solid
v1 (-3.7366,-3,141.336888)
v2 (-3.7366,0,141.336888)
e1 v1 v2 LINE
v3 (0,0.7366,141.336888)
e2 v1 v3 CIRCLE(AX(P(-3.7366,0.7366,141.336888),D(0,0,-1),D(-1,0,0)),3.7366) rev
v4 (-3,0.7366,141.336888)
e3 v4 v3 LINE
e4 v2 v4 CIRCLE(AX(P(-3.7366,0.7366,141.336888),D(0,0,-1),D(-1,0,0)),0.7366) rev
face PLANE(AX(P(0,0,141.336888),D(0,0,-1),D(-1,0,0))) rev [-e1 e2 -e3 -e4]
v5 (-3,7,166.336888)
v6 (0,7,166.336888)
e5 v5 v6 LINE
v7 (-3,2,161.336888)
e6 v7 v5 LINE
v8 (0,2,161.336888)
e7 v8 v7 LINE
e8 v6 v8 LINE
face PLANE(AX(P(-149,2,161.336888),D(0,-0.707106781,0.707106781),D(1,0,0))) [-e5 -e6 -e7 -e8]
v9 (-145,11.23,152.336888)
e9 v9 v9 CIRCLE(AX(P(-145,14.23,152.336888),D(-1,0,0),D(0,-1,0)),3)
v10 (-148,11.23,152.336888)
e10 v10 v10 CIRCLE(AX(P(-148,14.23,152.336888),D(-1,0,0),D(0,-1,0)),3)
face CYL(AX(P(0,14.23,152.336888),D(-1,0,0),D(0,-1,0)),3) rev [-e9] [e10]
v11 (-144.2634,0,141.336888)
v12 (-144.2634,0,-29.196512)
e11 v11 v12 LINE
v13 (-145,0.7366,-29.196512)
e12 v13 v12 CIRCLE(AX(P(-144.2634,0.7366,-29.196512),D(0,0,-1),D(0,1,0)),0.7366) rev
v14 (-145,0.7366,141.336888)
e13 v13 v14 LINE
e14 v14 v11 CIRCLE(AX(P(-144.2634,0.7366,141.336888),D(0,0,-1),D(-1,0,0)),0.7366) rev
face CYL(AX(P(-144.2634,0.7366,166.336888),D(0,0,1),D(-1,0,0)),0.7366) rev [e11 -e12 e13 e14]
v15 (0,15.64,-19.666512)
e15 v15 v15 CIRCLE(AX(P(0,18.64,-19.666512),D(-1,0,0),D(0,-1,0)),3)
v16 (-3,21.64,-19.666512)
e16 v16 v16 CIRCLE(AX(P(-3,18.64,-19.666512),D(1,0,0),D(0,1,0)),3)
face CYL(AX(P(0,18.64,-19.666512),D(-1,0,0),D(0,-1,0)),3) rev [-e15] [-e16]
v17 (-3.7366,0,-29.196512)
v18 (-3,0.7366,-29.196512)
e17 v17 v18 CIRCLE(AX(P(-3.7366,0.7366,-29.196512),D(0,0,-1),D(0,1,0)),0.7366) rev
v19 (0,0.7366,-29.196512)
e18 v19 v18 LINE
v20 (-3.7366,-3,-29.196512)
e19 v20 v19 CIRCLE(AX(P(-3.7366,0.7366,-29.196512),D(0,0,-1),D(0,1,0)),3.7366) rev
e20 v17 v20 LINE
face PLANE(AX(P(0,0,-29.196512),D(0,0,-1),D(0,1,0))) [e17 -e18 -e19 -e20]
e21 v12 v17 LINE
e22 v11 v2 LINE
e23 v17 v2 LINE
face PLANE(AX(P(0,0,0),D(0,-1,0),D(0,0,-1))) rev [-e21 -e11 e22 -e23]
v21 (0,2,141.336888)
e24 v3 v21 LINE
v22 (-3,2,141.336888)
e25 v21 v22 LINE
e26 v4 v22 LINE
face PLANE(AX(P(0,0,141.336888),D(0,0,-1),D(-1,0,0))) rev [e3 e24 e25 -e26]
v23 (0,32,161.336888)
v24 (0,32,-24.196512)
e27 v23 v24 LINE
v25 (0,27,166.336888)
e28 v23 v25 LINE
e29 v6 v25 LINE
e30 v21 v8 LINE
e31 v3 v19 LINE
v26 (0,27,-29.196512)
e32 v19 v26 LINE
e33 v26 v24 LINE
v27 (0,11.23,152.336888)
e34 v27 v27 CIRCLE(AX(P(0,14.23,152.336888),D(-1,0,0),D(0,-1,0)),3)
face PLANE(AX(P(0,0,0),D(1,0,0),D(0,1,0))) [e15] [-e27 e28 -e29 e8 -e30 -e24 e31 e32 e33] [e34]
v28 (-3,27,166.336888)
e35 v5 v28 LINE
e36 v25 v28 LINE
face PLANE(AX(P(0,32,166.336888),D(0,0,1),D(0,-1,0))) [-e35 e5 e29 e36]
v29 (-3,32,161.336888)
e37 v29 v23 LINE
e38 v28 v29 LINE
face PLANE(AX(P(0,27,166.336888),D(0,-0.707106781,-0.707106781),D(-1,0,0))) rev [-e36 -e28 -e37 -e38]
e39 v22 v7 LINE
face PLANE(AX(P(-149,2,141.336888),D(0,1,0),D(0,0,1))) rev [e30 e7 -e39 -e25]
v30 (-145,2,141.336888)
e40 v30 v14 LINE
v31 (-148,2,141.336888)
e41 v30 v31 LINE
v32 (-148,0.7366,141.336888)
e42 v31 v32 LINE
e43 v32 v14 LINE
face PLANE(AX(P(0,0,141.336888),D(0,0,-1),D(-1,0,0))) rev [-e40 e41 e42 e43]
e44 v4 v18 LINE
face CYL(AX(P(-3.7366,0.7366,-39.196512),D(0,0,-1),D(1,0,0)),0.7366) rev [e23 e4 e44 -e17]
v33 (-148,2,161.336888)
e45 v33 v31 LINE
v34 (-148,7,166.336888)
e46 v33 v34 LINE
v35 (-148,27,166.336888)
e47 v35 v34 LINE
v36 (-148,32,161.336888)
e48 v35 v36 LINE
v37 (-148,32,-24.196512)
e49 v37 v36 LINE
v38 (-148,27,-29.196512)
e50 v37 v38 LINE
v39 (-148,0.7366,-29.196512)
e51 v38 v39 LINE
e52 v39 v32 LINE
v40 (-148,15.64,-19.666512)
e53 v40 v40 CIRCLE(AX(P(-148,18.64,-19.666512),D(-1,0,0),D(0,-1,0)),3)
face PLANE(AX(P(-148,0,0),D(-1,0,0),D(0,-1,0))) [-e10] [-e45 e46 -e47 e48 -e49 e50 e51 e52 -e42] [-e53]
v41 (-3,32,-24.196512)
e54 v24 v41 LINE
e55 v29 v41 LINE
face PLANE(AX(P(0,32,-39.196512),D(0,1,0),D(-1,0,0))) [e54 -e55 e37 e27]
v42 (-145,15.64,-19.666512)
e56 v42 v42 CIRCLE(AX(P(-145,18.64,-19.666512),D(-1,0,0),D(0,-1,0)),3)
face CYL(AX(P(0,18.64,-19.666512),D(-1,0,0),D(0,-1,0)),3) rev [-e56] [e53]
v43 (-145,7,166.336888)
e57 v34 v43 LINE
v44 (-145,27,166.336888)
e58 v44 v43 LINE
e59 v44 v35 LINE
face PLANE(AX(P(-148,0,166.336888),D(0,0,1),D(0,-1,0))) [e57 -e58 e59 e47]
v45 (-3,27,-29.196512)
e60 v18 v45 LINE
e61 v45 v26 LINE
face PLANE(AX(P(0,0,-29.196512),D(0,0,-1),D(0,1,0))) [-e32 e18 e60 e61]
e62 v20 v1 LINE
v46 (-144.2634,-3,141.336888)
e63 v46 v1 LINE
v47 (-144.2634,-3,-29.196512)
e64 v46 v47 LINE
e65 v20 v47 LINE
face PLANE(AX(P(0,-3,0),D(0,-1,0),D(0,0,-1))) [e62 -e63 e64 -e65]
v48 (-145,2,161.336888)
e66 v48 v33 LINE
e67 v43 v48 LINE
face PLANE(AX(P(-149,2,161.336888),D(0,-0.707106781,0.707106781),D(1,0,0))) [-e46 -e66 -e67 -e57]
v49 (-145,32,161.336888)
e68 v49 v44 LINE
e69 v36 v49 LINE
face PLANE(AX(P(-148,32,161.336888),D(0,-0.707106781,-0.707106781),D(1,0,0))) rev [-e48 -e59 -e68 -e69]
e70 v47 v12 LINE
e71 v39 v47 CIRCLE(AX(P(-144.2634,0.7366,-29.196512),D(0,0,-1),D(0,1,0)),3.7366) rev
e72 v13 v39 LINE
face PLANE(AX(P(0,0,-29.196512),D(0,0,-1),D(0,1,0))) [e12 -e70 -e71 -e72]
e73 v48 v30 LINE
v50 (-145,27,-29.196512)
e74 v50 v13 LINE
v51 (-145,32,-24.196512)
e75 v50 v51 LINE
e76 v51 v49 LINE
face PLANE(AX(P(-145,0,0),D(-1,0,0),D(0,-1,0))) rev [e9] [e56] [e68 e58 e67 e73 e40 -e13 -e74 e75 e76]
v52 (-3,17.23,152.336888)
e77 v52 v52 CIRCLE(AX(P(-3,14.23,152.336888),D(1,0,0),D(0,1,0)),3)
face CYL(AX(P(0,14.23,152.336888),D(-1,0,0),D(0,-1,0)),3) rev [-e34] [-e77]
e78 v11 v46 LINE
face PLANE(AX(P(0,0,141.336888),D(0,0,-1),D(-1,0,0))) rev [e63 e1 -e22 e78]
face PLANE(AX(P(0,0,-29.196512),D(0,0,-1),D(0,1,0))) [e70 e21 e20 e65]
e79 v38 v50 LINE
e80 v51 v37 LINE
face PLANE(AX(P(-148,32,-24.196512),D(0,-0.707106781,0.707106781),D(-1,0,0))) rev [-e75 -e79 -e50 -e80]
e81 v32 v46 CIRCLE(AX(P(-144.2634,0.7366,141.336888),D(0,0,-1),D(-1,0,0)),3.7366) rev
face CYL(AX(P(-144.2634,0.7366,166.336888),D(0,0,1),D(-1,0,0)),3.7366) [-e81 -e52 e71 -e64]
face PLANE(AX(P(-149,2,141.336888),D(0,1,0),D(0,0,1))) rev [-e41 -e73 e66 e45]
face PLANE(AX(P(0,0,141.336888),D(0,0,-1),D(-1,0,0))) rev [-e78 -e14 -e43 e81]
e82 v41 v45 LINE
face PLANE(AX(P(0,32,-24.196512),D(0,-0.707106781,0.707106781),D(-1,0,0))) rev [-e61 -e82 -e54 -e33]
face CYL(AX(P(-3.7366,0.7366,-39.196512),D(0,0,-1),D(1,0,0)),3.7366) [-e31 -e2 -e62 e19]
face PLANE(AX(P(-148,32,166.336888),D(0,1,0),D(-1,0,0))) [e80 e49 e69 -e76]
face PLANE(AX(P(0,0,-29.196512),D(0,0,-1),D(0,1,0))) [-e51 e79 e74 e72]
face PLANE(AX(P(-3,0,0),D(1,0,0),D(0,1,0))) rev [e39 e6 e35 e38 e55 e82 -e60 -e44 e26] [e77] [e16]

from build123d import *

# Parameters (mm, degrees)
SKETCH18_W                     = 148
SKETCH18_H                     = 205.5334
BASE_FLANGE1_DEPTH             = 3
EDGE_FLANGE1_STRIP_W           = 13.4732
EDGE_FLANGE1_STRIP_H           = 3
EDGE_FLANGE1_STRIP_CUT_DEPTH   = 205.5334
EDGE_FLANGE1_STRIP_2_W         = 13.4732
EDGE_FLANGE1_STRIP_2_H         = 3
EDGE_FLANGE1_STRIP_CUT_2_DEPTH = 205.5334
EDGE_FLANGE1_DEPTH             = 205.5334
EDGE_FLANGE1_BEND_DEPTH        = 205.5334
SKETCH28_W                     = 150
SKETCH28_H                     = 8
CUT_EXTRUDE2_DEPTH             = 25
SKETCH30_R                     = 3
CUT_EXTRUDE3_DEPTH             = 225.935458149
SKETCH31_W                     = 157.455262849
SKETCH31_H                     = 40
CUT_EXTRUDE4_DEPTH             = 10
CHAMFER1_SIZE                  = 5


# Sheet-metal steps are written as plain solids
with BuildPart() as part:
    # Sketch18 → Base-Flange1 (new body)
    with BuildSketch(Plane(origin=(0, 0, 0), x_dir=(1, 0, 0), z_dir=(0, 1, 0))):
        with Locations((-74, -63.57018807)):
            Rectangle(SKETCH18_W, SKETCH18_H)
    extrude(amount=-BASE_FLANGE1_DEPTH)

    # Edge-Flange1 strip (across the edge) → Edge-Flange1 strip cut (cut)
    with BuildSketch(Plane(origin=(0, 0, 166.33688807), x_dir=(-1, 0, 0), z_dir=(0, 0, -1))):
        with Locations((-3, -1.5)):
            Rectangle(EDGE_FLANGE1_STRIP_W, EDGE_FLANGE1_STRIP_H)
    extrude(amount=EDGE_FLANGE1_STRIP_CUT_DEPTH, mode=Mode.SUBTRACT)

    # Edge-Flange1 strip 2 (across the edge) → Edge-Flange1 strip cut 2 (cut)
    with BuildSketch(Plane(origin=(-148, 0, -39.19651193), x_dir=(1, 0, 0), z_dir=(0, 0, 1))):
        with Locations((-3, -1.5)):
            Rectangle(EDGE_FLANGE1_STRIP_2_W, EDGE_FLANGE1_STRIP_2_H)
    extrude(amount=EDGE_FLANGE1_STRIP_CUT_2_DEPTH, mode=Mode.SUBTRACT)

    # Edge-Flange1 section (across the edge) → Edge-Flange1 (add)
    with BuildSketch(Plane(origin=(0, 0, 166.33688807), x_dir=(-1, 0, 0), z_dir=(0, 0, -1))):
        with BuildLine():
            Line((0, 0.7366), (0, 32))
            Line((0, 32), (3, 32))
            Line((3, 32), (3, 0.7366))
            ThreePointArc((3, 0.7366), (3.215745145, 0.215745145), (3.7366, 0))
            Line((3.7366, 0), (3.7366, -3))
            ThreePointArc((3.7366, -3), (1.094424801, -1.905575199), (0, 0.7366))
        make_face()
    extrude(amount=EDGE_FLANGE1_DEPTH)

    # Edge-Flange1 section 2 (across the edge) → Edge-Flange1 bend (add)
    with BuildSketch(Plane(origin=(-148, 0, -39.19651193), x_dir=(1, 0, 0), z_dir=(0, 0, 1))):
        with BuildLine():
            Line((0, 0.7366), (0, 32))
            Line((0, 32), (3, 32))
            Line((3, 32), (3, 0.7366))
            ThreePointArc((3, 0.7366), (3.215745145, 0.215745145), (3.7366, 0))
            Line((3.7366, 0), (3.7366, -3))
            ThreePointArc((3.7366, -3), (1.094424801, -1.905575199), (0, 0.7366))
        make_face()
    extrude(amount=EDGE_FLANGE1_BEND_DEPTH)

    # Sketch28 → Cut-Extrude2 (cut)
    with BuildSketch(Plane.XY.offset(166.33688807)):
        with Locations((-74, -2)):
            Rectangle(SKETCH28_W, SKETCH28_H)
    extrude(amount=-CUT_EXTRUDE2_DEPTH, mode=Mode.SUBTRACT)

    # Sketch30 → Cut-Extrude3 (cut, through all)
    with BuildSketch(Plane.ZY.offset(148)):
        with Locations(Location((152.33688807, 14.23, 0), (0, 0, 270))):
            Circle(SKETCH30_R)
        with Locations(Location((-19.66651193, 18.64, 0), (0, 0, 270))):
            Circle(SKETCH30_R)
    extrude(amount=-CUT_EXTRUDE3_DEPTH, mode=Mode.SUBTRACT)

    # Sketch31 → Cut-Extrude4 (cut)
    with BuildSketch(Plane(origin=(0, 0, -39.19651193), x_dir=(-1, 0, 0), z_dir=(0, 0, -1))):
        with Locations((75.148815223, 17)):
            Rectangle(SKETCH31_W, SKETCH31_H)
    extrude(amount=-CUT_EXTRUDE4_DEPTH, mode=Mode.SUBTRACT)

    # Chamfer1
    chamfer1_edges = [part.edges().sort_by_distance(p)[0] for p in [
        (-1.5, 2, 166.33688807),
        (-146.5, 32, -29.19651193),
        (-1.5, 32, -29.19651193),
        (-1.5, 32, 166.33688807),
        (-146.5, 32, 166.33688807),
        (-146.5, 2, 166.33688807),
    ]]
    chamfer(chamfer1_edges, length=CHAMFER1_SIZE)


solid = part.part
